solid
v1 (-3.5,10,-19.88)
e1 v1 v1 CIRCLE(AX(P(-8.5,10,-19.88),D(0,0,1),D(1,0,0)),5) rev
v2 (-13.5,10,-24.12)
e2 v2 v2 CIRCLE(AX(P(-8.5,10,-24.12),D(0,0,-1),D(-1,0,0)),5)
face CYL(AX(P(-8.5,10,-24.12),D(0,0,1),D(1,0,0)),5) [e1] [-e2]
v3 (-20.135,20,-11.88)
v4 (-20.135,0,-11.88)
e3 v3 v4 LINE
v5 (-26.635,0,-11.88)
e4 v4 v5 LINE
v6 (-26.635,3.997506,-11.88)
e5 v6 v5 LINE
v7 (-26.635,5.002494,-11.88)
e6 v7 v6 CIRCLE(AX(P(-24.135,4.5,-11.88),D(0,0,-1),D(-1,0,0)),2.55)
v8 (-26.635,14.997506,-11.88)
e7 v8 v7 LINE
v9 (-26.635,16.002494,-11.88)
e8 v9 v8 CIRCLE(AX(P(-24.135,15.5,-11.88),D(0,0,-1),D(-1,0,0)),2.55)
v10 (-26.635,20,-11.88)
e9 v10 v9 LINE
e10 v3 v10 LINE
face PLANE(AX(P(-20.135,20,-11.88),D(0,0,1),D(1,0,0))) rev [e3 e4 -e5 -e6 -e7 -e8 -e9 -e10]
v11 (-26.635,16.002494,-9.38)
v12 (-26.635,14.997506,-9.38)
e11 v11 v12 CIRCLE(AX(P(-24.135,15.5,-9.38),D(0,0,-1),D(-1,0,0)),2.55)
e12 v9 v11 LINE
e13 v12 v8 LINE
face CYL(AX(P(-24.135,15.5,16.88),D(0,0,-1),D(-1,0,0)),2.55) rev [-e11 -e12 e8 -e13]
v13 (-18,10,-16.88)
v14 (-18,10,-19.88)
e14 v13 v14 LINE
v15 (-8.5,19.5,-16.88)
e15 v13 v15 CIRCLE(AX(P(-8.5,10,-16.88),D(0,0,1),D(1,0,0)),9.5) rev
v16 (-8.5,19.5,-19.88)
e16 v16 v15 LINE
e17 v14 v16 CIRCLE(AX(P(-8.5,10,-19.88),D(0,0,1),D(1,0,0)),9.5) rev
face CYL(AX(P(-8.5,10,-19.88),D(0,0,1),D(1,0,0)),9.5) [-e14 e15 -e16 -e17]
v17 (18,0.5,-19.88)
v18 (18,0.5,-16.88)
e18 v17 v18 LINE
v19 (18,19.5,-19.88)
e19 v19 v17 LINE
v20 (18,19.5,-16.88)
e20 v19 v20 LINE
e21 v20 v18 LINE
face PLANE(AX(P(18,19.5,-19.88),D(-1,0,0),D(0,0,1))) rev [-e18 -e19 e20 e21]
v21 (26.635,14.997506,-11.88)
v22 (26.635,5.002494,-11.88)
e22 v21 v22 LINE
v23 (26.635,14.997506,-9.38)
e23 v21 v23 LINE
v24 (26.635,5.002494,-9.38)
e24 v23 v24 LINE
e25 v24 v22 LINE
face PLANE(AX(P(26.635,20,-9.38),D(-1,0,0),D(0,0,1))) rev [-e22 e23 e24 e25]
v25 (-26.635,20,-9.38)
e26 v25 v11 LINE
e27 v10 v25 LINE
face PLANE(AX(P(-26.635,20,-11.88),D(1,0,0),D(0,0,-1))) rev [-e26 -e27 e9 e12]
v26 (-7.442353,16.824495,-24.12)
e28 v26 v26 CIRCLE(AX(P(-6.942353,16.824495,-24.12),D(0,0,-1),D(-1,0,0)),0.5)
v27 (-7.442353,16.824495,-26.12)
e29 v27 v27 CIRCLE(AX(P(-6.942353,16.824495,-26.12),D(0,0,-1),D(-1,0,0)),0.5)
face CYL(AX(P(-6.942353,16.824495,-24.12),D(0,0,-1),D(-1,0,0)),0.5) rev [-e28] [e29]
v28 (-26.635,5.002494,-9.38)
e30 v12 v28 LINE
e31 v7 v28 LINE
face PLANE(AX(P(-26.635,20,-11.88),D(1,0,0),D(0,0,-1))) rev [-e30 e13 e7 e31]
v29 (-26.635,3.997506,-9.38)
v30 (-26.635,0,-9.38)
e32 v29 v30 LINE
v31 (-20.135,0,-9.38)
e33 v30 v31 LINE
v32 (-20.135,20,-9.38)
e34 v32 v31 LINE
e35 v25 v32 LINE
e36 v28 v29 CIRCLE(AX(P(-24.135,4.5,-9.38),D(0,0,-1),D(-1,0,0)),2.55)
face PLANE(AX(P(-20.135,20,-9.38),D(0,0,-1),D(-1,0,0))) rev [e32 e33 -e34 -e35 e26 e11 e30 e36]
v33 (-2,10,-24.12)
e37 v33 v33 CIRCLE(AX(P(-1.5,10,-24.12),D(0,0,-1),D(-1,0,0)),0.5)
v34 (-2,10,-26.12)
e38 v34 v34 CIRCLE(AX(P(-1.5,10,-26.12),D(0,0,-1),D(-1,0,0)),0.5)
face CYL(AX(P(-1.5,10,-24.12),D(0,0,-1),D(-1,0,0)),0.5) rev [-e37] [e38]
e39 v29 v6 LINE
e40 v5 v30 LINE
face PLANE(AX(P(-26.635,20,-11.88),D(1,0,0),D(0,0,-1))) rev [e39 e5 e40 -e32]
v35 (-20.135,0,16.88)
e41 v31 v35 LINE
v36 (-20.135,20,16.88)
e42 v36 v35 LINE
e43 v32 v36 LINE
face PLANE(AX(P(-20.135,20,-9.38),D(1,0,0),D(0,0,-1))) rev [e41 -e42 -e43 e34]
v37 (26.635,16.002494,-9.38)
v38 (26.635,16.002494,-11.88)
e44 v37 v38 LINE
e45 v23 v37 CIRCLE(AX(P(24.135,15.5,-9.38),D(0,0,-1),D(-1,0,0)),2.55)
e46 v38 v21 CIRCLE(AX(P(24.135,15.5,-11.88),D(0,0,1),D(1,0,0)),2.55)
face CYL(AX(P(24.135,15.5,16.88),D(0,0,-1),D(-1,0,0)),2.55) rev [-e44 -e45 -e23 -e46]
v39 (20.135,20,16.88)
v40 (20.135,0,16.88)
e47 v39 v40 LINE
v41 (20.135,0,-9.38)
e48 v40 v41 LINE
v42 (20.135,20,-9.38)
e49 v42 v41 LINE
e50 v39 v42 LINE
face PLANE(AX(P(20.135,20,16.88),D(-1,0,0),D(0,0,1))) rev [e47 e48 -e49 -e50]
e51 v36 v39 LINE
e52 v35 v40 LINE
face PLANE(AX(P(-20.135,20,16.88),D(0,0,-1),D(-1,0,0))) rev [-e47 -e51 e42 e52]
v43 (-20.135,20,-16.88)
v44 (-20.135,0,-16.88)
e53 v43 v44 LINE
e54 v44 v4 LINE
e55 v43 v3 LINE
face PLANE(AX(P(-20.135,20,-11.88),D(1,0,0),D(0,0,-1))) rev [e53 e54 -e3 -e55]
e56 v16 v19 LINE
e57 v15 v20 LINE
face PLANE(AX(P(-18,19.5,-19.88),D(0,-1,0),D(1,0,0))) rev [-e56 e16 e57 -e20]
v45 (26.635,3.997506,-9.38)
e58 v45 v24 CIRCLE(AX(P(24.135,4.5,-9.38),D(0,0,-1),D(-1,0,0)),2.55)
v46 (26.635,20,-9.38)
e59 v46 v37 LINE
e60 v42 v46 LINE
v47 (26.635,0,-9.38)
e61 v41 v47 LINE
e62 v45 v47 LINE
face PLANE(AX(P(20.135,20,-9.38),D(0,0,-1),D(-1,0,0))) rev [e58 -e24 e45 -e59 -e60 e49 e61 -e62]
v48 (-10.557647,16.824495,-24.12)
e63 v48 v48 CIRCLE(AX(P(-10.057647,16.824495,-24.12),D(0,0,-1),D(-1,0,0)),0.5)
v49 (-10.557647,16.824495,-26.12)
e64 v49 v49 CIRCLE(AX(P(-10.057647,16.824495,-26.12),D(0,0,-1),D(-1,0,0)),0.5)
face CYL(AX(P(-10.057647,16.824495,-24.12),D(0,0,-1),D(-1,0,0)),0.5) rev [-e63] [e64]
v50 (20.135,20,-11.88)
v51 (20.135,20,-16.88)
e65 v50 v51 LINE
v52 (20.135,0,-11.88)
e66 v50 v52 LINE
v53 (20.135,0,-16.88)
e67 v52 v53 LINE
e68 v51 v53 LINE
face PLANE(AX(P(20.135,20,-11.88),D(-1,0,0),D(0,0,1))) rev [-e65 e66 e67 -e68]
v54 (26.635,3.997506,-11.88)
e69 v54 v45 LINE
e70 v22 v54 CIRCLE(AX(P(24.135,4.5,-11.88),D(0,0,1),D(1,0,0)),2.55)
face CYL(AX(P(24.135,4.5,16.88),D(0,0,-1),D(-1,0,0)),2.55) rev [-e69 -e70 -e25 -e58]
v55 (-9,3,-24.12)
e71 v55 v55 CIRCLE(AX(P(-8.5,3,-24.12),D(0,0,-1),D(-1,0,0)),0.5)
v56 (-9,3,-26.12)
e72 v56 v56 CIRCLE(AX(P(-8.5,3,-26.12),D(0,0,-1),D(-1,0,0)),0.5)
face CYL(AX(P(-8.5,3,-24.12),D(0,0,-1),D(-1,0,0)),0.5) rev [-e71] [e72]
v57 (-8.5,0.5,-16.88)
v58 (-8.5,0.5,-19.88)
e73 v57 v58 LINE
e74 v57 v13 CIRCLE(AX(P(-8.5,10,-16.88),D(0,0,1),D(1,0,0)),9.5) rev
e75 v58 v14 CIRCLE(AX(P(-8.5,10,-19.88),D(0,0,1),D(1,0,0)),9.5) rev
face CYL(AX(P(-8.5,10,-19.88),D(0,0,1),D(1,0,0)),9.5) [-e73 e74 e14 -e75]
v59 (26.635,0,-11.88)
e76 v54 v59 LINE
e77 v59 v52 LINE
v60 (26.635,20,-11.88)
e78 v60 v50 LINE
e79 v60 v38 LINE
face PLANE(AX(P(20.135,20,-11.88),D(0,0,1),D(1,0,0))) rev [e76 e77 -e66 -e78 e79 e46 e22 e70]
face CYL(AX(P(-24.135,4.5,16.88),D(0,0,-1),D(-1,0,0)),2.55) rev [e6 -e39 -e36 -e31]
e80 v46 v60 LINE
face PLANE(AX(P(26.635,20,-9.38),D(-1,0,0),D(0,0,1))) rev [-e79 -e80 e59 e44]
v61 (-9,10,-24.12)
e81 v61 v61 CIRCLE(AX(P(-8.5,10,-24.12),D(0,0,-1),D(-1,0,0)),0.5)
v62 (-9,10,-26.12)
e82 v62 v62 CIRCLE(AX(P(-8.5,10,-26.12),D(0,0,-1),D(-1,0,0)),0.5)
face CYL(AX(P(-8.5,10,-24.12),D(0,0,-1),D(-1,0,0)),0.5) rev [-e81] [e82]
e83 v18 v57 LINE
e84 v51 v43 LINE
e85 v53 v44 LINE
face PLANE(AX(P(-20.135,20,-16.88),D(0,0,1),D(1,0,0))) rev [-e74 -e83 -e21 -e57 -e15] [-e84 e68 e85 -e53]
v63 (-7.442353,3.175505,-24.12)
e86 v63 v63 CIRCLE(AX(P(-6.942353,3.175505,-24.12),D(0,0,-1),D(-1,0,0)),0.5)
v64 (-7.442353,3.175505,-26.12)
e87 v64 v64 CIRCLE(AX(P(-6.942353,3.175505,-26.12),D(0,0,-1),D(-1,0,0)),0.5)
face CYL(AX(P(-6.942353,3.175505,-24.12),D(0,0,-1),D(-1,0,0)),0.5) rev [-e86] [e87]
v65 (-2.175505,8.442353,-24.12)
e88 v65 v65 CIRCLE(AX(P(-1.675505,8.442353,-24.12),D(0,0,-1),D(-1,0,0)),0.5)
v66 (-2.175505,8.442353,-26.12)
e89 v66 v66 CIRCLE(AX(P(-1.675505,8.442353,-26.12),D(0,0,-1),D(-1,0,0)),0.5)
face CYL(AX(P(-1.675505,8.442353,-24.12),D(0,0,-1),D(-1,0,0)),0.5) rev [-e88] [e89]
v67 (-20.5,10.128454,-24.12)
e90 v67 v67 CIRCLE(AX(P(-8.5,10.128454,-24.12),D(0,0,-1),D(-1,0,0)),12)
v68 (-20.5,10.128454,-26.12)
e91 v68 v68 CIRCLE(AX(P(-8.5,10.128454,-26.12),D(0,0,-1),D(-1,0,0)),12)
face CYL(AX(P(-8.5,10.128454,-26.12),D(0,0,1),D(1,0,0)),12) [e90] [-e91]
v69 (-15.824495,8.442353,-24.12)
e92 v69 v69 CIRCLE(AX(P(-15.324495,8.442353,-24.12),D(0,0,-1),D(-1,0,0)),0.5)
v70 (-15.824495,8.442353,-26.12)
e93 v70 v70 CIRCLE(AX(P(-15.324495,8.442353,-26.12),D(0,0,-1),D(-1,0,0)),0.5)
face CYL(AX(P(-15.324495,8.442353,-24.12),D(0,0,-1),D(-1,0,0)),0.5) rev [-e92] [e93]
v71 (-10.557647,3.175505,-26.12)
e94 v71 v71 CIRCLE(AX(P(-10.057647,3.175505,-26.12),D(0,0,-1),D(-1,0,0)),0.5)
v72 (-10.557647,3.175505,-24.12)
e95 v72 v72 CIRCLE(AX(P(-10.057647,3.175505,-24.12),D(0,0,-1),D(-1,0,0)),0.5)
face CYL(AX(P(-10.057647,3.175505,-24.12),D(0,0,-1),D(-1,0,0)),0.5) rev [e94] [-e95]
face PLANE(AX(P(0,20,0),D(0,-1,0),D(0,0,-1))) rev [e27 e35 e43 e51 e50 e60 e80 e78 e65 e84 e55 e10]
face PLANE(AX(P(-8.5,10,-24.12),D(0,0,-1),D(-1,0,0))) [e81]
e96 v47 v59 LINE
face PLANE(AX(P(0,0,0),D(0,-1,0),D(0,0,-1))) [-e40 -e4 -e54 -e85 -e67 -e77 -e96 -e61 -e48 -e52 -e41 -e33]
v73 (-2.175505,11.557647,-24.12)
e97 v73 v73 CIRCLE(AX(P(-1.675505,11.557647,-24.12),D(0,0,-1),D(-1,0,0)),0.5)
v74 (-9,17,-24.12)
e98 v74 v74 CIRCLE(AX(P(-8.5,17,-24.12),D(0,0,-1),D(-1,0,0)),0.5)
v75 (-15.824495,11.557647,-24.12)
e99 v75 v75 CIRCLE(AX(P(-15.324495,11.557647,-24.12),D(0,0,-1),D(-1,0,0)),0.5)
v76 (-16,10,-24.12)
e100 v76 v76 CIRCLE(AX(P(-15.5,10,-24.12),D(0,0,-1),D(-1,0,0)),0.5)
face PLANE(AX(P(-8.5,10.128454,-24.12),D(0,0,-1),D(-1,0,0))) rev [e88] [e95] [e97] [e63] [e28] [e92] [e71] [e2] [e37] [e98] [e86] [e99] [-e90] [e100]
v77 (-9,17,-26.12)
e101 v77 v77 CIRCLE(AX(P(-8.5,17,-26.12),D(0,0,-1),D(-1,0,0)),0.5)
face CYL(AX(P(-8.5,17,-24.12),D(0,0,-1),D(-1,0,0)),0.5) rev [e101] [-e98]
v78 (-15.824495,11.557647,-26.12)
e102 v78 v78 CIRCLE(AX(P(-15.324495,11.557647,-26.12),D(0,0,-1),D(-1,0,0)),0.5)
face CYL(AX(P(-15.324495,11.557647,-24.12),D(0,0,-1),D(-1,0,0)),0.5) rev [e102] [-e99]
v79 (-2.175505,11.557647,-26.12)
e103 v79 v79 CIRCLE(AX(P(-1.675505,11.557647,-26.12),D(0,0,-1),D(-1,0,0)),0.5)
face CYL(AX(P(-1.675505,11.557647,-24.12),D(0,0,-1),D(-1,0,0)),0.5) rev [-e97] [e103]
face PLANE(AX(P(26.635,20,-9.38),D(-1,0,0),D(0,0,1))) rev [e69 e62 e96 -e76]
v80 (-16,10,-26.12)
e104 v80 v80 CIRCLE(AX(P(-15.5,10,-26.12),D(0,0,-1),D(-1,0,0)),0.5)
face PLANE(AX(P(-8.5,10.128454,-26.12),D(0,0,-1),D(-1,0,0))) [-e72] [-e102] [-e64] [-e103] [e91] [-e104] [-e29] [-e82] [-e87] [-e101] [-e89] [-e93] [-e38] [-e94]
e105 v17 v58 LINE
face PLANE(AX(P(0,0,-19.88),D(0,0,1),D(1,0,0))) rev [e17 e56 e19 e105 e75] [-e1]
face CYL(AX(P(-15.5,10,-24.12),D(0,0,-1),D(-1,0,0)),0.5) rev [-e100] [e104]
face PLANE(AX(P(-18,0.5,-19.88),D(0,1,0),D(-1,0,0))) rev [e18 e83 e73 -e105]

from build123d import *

# Parameters (mm, degrees)
BOSS_EXTRUDE1_DEPTH = 20
SKETCH3_W           = 36
SKETCH3_H           = 19
BOSS_EXTRUDE2_DEPTH = 3
FILLET3_R           = 9.5
FILLET4_R           = 9.5
SKETCH4_R           = 5
BOSS_EXTRUDE3_DEPTH = 4.24
SKETCH5_R           = 12
BOSS_EXTRUDE4_DEPTH = 2
SKETCH6_R           = 2.55
CUT_EXTRUDE4_DEPTH  = 46.01365694
SKETCH8_R           = 0.5
CUT_EXTRUDE5_DEPTH  = 2


with BuildPart() as part:
    # Sketch1 → Boss-Extrude1 (new body)
    with BuildSketch(Plane(origin=(0, 0, 0), x_dir=(1, 0, 0), z_dir=(0, 1, 0))):
        Polygon((20.135, 9.38), (26.635, 9.38), (26.635, 11.88), (20.135, 11.88), (20.135, 16.88), (-20.135, 16.88), (-20.135, 11.88), (-26.635, 11.88), (-26.635, 9.38), (-20.135, 9.38), (-20.135, -16.88), (20.135, -16.88), align=None)
    extrude(amount=BOSS_EXTRUDE1_DEPTH)

    # Sketch3 → Boss-Extrude2 (add)
    with BuildSketch(Plane(origin=(0, 0, -16.88), x_dir=(-1, 0, 0), z_dir=(0, 0, -1))):
        with Locations((0, 10)):
            Rectangle(SKETCH3_W, SKETCH3_H)
    extrude(amount=BOSS_EXTRUDE2_DEPTH)

    # Fillet3
    fillet3_edges = [part.edges().sort_by_distance(p)[0] for p in [
        (-18, 19.5, -18.38),
    ]]
    fillet(fillet3_edges, radius=FILLET3_R)

    # Fillet4
    fillet4_edges = [part.edges().sort_by_distance(p)[0] for p in [
        (-18, 0.5, -18.38),
    ]]
    fillet(fillet4_edges, radius=FILLET4_R - 0.0001)  # a hair under: the kernel refuses the full size

    # Sketch4 → Boss-Extrude3 (add)
    with BuildSketch(Plane(origin=(0, 0, -19.88), x_dir=(-1, 0, 0), z_dir=(0, 0, -1))):
        with Locations(Location((8.5, 10, 0), (0, 0, 180))):
            Circle(SKETCH4_R)
    extrude(amount=BOSS_EXTRUDE3_DEPTH)

    # Sketch5 → Boss-Extrude4 (add)
    with BuildSketch(Plane(origin=(0, 0, -24.12), x_dir=(-1, 0, 0), z_dir=(0, 0, -1))):
        with Locations((8.5, 10.128454218)):
            Circle(SKETCH5_R)
    extrude(amount=BOSS_EXTRUDE4_DEPTH)

    # Sketch6 → Cut-Extrude4 (cut, through all)
    with BuildSketch(Plane(origin=(0, 0, -11.88), x_dir=(-1, 0, 0), z_dir=(0, 0, -1))):
        with Locations((-24.135, 15.5)):
            Circle(SKETCH6_R)
        with Locations((-24.135, 4.5)):
            Circle(SKETCH6_R)
        with Locations((24.135, 15.5)):
            Circle(SKETCH6_R)
        with Locations((24.135, 4.5)):
            Circle(SKETCH6_R)
    extrude(amount=-CUT_EXTRUDE4_DEPTH, mode=Mode.SUBTRACT)

    # Sketch8 → Cut-Extrude5 (cut)
    with BuildSketch(Plane(origin=(0, 0, -26.12), x_dir=(-1, 0, 0), z_dir=(0, 0, -1))):
        with Locations((8.5, 10)):
            Circle(SKETCH8_R)
        with Locations((1.675504615, 11.557646538)):
            Circle(SKETCH8_R)
        with Locations((1.5, 10)):
            Circle(SKETCH8_R)
        with Locations((6.942353462, 16.824495385)):
            Circle(SKETCH8_R)
        with Locations((8.5, 17)):
            Circle(SKETCH8_R)
        with Locations((10.057646538, 16.824495385)):
            Circle(SKETCH8_R)
        with Locations((15.324495385, 11.557646538)):
            Circle(SKETCH8_R)
        with Locations((15.5, 10)):
            Circle(SKETCH8_R)
        with Locations((15.324495385, 8.442353462)):
            Circle(SKETCH8_R)
        with Locations((10.057646538, 3.175504615)):
            Circle(SKETCH8_R)
        with Locations((8.5, 3)):
            Circle(SKETCH8_R)
        with Locations((6.942353462, 3.175504615)):
            Circle(SKETCH8_R)
        with Locations((1.675504615, 8.442353462)):
            Circle(SKETCH8_R)
    extrude(amount=-CUT_EXTRUDE5_DEPTH, mode=Mode.SUBTRACT)


solid = part.part
